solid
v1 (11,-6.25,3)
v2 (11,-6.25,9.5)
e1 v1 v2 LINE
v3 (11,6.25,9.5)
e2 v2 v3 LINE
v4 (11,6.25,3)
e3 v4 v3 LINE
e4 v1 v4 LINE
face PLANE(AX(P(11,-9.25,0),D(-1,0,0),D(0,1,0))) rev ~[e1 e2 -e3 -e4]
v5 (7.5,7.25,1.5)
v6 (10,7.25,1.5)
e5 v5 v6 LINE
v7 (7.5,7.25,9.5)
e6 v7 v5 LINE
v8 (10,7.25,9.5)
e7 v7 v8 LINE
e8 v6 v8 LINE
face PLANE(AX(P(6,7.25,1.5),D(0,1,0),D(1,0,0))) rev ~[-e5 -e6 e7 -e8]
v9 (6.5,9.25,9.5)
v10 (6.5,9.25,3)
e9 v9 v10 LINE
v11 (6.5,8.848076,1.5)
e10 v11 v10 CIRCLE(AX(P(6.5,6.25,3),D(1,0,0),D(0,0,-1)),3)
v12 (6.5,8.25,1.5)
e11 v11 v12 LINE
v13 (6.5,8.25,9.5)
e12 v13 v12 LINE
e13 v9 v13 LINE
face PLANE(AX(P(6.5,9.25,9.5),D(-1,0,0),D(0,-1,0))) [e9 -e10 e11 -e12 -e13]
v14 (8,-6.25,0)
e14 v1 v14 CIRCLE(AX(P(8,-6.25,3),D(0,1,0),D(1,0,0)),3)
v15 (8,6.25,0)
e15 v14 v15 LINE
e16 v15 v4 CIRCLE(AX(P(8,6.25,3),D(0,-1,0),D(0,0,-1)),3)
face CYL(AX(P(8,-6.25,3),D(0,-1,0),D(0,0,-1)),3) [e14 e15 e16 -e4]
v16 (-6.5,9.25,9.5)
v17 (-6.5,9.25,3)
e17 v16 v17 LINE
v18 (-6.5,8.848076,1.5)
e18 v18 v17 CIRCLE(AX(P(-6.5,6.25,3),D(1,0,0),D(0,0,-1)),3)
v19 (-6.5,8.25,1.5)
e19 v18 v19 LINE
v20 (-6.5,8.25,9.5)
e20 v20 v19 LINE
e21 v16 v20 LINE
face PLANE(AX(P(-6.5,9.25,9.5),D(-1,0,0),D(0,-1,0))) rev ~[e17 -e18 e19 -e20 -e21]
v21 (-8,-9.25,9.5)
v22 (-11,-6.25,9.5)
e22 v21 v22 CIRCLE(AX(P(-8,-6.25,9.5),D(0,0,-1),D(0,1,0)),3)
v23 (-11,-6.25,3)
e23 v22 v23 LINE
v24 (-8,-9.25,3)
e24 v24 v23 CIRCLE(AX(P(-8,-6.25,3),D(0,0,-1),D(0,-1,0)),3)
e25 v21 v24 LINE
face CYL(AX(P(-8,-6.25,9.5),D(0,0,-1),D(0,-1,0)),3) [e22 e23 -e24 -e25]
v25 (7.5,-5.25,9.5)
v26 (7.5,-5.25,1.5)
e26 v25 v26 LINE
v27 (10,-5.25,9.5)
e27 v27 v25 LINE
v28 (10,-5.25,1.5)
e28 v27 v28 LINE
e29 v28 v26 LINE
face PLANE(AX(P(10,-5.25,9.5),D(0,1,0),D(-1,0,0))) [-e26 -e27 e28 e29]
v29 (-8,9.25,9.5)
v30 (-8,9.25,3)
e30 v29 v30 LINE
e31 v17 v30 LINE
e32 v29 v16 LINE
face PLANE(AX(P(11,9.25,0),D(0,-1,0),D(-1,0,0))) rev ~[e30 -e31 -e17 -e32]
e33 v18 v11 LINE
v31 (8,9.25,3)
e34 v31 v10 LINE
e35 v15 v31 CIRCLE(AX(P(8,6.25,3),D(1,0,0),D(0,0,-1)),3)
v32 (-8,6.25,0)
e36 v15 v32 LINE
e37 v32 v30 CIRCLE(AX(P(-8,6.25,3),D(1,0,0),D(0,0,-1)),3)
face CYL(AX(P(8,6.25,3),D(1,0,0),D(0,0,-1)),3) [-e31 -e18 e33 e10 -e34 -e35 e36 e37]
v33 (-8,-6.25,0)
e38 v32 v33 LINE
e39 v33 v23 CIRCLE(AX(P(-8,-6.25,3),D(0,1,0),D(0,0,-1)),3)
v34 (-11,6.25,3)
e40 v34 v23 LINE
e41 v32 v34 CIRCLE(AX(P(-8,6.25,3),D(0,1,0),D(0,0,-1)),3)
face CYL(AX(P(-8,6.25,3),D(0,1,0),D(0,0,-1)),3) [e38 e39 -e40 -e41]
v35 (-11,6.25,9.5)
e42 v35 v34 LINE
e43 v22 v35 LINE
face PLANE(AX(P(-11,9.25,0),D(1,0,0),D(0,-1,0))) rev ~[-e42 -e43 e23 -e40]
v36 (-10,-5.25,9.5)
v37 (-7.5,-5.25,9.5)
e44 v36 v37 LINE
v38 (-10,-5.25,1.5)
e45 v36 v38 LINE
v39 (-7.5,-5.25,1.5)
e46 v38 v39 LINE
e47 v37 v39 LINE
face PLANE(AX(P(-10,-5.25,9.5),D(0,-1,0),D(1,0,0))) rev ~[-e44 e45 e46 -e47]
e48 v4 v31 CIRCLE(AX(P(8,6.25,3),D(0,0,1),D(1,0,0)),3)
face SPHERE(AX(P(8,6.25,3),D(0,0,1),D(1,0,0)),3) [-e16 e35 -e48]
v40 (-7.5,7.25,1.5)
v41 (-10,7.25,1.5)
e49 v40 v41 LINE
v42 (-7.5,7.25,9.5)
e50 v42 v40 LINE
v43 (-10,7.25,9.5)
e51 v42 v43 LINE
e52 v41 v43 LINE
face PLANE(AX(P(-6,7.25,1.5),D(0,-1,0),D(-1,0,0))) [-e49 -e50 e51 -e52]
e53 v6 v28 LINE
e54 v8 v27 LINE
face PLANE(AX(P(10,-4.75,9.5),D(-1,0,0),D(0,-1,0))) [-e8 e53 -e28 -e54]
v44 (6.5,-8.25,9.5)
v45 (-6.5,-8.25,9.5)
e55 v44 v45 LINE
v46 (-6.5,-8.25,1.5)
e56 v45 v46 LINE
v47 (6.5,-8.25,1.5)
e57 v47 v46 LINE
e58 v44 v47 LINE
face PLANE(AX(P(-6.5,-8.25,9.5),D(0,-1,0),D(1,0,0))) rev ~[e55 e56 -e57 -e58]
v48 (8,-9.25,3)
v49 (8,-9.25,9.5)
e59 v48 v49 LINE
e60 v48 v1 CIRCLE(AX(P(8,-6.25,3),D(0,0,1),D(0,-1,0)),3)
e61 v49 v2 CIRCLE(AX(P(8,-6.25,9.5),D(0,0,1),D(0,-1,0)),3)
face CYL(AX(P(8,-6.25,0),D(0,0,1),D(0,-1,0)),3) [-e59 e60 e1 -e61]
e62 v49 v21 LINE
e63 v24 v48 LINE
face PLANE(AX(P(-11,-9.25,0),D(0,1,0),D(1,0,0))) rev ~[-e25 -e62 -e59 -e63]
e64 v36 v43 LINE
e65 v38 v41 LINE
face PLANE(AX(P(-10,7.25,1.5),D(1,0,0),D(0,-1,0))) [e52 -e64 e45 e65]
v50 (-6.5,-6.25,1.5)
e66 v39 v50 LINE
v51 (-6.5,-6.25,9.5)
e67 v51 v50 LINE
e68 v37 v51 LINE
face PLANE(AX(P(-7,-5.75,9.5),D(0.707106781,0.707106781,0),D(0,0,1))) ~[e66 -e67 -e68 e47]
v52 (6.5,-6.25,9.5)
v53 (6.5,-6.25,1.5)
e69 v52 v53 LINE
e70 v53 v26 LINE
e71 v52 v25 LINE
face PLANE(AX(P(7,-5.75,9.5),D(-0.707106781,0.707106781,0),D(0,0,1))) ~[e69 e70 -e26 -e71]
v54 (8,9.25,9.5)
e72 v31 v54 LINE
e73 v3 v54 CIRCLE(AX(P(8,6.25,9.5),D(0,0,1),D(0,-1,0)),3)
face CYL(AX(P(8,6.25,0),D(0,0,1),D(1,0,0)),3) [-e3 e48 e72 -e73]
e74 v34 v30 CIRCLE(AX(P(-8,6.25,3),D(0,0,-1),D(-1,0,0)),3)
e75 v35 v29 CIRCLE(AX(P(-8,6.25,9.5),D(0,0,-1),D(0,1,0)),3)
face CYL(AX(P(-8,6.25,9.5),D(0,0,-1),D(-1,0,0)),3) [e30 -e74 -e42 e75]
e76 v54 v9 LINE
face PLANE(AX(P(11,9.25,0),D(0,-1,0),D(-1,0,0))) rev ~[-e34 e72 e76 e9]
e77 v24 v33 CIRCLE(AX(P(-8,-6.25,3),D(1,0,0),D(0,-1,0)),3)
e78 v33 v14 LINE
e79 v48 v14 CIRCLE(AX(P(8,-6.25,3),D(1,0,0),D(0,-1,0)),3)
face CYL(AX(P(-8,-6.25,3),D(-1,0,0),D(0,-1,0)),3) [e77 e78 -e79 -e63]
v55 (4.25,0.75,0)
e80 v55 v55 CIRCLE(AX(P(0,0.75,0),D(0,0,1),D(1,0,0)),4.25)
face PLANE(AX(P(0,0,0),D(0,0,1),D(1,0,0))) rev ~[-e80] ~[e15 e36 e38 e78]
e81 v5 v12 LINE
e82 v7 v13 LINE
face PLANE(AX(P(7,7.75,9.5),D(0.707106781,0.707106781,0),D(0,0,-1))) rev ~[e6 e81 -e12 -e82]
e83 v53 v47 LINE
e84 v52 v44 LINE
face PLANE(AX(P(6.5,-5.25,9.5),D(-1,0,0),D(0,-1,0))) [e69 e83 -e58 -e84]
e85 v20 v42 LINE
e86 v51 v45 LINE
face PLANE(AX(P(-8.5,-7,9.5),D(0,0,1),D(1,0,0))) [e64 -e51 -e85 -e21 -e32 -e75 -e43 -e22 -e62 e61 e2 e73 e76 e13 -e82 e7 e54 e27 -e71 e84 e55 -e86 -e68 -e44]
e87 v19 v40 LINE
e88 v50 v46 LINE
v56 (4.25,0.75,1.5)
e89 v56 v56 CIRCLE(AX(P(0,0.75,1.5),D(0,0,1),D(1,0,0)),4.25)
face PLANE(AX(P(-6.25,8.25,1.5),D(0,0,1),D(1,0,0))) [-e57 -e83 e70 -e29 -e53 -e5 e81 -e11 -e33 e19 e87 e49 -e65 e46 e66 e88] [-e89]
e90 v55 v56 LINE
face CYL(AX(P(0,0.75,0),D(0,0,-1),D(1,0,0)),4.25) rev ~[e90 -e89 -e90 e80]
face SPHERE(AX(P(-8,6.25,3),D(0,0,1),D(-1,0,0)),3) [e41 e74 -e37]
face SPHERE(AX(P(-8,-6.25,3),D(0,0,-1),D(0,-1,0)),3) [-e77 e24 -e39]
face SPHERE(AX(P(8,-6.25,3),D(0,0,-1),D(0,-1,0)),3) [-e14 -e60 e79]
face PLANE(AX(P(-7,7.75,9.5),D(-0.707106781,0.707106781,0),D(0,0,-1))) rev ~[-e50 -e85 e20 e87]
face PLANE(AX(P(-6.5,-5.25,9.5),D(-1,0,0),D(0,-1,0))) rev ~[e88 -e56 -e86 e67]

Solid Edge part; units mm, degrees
sketch "Sketch1" plane through (0, 0, 0) normal (0, 0, 1) x (1, 0, 0)
  line L0 (-11, -9.25) -> (11, -9.25)
  line L1 (11, -9.25) -> (11, 9.25)
  line L2 (11, 9.25) -> (-11, 9.25)
  line L3 (-11, 9.25) -> (-11, -9.25)
  circle A0 centre (0, 0.75) radius 4.25
  dimension "D1" = 18.5
  dimension "D2" = 22
  dimension "D3" = 8.5
  dimension "D4" = 8.5
extrude "Protrusion1" add sketch "Sketch1" along normal blind 1.5
sketch "Sketch2" plane through (0, 0, 1.5) normal (0, 0, 1) x (1, 0, 0)
  line L0 (11, -9.25) -> (6, -9.25)
  line L1 (6, -9.25) -> (6, -4.75)
  line L2 (6, -4.75) -> (11, -4.75)
  line L3 (11, -4.75) -> (11, -9.25)
  line L4 (-11, -9.25) -> (-6, -9.25)
  line L5 (-6, -9.25) -> (-6, -4.75)
  line L6 (-6, -4.75) -> (-11, -4.75)
  line L7 (-11, -4.75) -> (-11, -9.25)
  dimension "D1" = 4.5
  dimension "D2" = 5
  dimension "D3" = 5
  dimension "D4" = 4.5
extrude "bottom_extension" add sketch "Sketch2" along normal blind 8
sketch "Sketch3" plane through (0, 0, 1.5) normal (0, 0, 1) x (1, 0, 0)
  line L0 (-6, -9.25) -> (6, -9.25)
  line L1 (6, -9.25) -> (6, -8.25)
  line L2 (6, -8.25) -> (-6, -8.25)
  line L3 (-6, -8.25) -> (-6, -9.25)
  dimension "D1" = 1
extrude "Protrusion2" add sketch "Sketch3" along normal up to vertex (8 mm away)
sketch "Sketch4" plane through (0, 0.5, 1.5) normal (0, 0, 1) x (1, 0, 0)
  line L0 (11, 8.75) -> (6, 8.75)
  line L1 (6, 8.75) -> (6, 6.75)
  line L2 (6, 6.75) -> (11, 6.75)
  line L3 (11, 6.75) -> (11, 8.75)
  line L4 (-11, 8.75) -> (-6, 8.75)
  line L5 (-6, 8.75) -> (-6, 6.75)
  line L6 (-6, 6.75) -> (-11, 6.75)
  line L7 (-11, 6.75) -> (-11, 8.75)
  dimension "D1" = 2
  dimension "D2" = 5
extrude "Protrusion3" add sketch "Sketch4" along normal up to vertex (8 mm away)
sketch "Sketch5" plane through (0, 0.5, 1.5) normal (0, 0, 1) x (1, 0, 0)
  line L0 (-11, 6.75) -> (-10, 6.75)
  line L1 (-10, 6.75) -> (-10, -5.25)
  line L2 (-10, -5.25) -> (-11, -5.25)
  line L3 (-11, -5.25) -> (-11, 6.75)
  line L4 (11, -5.25) -> (10, -5.25)
  line L5 (10, -5.25) -> (10, 6.75)
  line L6 (10, 6.75) -> (11, 6.75)
  line L7 (11, 6.75) -> (11, -5.25)
  dimension "D1" = 1
  dimension "D2" = 1
extrude "Protrusion4" add sketch "Sketch5" along normal up to vertex (8 mm away)
fillet "Verrundung_1" radius 3 4 edges at (-11, 9.25, 4.75) (11, 9.25, 4.75) (11, -9.25, 4.75) (-11, -9.25, 4.75)
fillet "Verrundung_2" radius 3 7 edges at (0, -9.25, 0) (10.1213, -8.3713, 0) (11, 0, 0) (0, 9.25, 0) (-10.1213, 8.3713, 0) (-11, 0, 0) (-10.1213, -8.3713, 0)
sketch "Sketch6" plane through (0, 0, 9.5) normal (0, 0, 1) x (1, 0, 0)
  line L0 (-6, 9.25) -> (-6.5, 9.25)
  line L1 (-6.5, 9.25) -> (-6.5, 7.25)
  line L2 (-6.5, 7.25) -> (-6, 7.25)
  line L3 (-6, 7.25) -> (-6, 9.25)
  line L4 (6, 9.25) -> (6.5, 9.25)
  line L5 (6.5, 9.25) -> (6.5, 7.25)
  line L6 (6.5, 7.25) -> (6, 7.25)
  line L7 (6, 7.25) -> (6, 9.25)
  line L8 (-10, -4.75) -> (-6, -4.75)
  line L9 (-6, -4.75) -> (-6, -8.25)
  line L10 (-6.5, -8.25) -> (-6, -8.25)
  line L11 (-6.5, -5.25) -> (-6.5, -8.25)
  line L12 (-10, -5.25) -> (-6.5, -5.25)
  line L13 (-10, -5.25) -> (-10, -4.75)
  line L14 (6, -4.75) -> (10, -4.75)
  line L15 (10, -4.75) -> (10, -5.25)
  line L16 (10, -5.25) -> (6.5, -5.25)
  line L17 (6.5, -5.25) -> (6.5, -8.25)
  line L18 (6.5, -8.25) -> (6, -8.25)
  line L19 (6, -8.25) -> (6, -4.75)
  dimension "D1" = 0.5
extrude "Cutout1" cut sketch "Sketch6" against normal up to vertex (8 mm away)
chamfer "Fase_2" distance 1 angle 45 4 edges at (-6.5, 7.25, 5.5) (6.5, 7.25, 5.5) (6.5, -5.25, 5.5) (-6.5, -5.25, 5.5)
properties material "ABS-Plastik, mittelfest"
